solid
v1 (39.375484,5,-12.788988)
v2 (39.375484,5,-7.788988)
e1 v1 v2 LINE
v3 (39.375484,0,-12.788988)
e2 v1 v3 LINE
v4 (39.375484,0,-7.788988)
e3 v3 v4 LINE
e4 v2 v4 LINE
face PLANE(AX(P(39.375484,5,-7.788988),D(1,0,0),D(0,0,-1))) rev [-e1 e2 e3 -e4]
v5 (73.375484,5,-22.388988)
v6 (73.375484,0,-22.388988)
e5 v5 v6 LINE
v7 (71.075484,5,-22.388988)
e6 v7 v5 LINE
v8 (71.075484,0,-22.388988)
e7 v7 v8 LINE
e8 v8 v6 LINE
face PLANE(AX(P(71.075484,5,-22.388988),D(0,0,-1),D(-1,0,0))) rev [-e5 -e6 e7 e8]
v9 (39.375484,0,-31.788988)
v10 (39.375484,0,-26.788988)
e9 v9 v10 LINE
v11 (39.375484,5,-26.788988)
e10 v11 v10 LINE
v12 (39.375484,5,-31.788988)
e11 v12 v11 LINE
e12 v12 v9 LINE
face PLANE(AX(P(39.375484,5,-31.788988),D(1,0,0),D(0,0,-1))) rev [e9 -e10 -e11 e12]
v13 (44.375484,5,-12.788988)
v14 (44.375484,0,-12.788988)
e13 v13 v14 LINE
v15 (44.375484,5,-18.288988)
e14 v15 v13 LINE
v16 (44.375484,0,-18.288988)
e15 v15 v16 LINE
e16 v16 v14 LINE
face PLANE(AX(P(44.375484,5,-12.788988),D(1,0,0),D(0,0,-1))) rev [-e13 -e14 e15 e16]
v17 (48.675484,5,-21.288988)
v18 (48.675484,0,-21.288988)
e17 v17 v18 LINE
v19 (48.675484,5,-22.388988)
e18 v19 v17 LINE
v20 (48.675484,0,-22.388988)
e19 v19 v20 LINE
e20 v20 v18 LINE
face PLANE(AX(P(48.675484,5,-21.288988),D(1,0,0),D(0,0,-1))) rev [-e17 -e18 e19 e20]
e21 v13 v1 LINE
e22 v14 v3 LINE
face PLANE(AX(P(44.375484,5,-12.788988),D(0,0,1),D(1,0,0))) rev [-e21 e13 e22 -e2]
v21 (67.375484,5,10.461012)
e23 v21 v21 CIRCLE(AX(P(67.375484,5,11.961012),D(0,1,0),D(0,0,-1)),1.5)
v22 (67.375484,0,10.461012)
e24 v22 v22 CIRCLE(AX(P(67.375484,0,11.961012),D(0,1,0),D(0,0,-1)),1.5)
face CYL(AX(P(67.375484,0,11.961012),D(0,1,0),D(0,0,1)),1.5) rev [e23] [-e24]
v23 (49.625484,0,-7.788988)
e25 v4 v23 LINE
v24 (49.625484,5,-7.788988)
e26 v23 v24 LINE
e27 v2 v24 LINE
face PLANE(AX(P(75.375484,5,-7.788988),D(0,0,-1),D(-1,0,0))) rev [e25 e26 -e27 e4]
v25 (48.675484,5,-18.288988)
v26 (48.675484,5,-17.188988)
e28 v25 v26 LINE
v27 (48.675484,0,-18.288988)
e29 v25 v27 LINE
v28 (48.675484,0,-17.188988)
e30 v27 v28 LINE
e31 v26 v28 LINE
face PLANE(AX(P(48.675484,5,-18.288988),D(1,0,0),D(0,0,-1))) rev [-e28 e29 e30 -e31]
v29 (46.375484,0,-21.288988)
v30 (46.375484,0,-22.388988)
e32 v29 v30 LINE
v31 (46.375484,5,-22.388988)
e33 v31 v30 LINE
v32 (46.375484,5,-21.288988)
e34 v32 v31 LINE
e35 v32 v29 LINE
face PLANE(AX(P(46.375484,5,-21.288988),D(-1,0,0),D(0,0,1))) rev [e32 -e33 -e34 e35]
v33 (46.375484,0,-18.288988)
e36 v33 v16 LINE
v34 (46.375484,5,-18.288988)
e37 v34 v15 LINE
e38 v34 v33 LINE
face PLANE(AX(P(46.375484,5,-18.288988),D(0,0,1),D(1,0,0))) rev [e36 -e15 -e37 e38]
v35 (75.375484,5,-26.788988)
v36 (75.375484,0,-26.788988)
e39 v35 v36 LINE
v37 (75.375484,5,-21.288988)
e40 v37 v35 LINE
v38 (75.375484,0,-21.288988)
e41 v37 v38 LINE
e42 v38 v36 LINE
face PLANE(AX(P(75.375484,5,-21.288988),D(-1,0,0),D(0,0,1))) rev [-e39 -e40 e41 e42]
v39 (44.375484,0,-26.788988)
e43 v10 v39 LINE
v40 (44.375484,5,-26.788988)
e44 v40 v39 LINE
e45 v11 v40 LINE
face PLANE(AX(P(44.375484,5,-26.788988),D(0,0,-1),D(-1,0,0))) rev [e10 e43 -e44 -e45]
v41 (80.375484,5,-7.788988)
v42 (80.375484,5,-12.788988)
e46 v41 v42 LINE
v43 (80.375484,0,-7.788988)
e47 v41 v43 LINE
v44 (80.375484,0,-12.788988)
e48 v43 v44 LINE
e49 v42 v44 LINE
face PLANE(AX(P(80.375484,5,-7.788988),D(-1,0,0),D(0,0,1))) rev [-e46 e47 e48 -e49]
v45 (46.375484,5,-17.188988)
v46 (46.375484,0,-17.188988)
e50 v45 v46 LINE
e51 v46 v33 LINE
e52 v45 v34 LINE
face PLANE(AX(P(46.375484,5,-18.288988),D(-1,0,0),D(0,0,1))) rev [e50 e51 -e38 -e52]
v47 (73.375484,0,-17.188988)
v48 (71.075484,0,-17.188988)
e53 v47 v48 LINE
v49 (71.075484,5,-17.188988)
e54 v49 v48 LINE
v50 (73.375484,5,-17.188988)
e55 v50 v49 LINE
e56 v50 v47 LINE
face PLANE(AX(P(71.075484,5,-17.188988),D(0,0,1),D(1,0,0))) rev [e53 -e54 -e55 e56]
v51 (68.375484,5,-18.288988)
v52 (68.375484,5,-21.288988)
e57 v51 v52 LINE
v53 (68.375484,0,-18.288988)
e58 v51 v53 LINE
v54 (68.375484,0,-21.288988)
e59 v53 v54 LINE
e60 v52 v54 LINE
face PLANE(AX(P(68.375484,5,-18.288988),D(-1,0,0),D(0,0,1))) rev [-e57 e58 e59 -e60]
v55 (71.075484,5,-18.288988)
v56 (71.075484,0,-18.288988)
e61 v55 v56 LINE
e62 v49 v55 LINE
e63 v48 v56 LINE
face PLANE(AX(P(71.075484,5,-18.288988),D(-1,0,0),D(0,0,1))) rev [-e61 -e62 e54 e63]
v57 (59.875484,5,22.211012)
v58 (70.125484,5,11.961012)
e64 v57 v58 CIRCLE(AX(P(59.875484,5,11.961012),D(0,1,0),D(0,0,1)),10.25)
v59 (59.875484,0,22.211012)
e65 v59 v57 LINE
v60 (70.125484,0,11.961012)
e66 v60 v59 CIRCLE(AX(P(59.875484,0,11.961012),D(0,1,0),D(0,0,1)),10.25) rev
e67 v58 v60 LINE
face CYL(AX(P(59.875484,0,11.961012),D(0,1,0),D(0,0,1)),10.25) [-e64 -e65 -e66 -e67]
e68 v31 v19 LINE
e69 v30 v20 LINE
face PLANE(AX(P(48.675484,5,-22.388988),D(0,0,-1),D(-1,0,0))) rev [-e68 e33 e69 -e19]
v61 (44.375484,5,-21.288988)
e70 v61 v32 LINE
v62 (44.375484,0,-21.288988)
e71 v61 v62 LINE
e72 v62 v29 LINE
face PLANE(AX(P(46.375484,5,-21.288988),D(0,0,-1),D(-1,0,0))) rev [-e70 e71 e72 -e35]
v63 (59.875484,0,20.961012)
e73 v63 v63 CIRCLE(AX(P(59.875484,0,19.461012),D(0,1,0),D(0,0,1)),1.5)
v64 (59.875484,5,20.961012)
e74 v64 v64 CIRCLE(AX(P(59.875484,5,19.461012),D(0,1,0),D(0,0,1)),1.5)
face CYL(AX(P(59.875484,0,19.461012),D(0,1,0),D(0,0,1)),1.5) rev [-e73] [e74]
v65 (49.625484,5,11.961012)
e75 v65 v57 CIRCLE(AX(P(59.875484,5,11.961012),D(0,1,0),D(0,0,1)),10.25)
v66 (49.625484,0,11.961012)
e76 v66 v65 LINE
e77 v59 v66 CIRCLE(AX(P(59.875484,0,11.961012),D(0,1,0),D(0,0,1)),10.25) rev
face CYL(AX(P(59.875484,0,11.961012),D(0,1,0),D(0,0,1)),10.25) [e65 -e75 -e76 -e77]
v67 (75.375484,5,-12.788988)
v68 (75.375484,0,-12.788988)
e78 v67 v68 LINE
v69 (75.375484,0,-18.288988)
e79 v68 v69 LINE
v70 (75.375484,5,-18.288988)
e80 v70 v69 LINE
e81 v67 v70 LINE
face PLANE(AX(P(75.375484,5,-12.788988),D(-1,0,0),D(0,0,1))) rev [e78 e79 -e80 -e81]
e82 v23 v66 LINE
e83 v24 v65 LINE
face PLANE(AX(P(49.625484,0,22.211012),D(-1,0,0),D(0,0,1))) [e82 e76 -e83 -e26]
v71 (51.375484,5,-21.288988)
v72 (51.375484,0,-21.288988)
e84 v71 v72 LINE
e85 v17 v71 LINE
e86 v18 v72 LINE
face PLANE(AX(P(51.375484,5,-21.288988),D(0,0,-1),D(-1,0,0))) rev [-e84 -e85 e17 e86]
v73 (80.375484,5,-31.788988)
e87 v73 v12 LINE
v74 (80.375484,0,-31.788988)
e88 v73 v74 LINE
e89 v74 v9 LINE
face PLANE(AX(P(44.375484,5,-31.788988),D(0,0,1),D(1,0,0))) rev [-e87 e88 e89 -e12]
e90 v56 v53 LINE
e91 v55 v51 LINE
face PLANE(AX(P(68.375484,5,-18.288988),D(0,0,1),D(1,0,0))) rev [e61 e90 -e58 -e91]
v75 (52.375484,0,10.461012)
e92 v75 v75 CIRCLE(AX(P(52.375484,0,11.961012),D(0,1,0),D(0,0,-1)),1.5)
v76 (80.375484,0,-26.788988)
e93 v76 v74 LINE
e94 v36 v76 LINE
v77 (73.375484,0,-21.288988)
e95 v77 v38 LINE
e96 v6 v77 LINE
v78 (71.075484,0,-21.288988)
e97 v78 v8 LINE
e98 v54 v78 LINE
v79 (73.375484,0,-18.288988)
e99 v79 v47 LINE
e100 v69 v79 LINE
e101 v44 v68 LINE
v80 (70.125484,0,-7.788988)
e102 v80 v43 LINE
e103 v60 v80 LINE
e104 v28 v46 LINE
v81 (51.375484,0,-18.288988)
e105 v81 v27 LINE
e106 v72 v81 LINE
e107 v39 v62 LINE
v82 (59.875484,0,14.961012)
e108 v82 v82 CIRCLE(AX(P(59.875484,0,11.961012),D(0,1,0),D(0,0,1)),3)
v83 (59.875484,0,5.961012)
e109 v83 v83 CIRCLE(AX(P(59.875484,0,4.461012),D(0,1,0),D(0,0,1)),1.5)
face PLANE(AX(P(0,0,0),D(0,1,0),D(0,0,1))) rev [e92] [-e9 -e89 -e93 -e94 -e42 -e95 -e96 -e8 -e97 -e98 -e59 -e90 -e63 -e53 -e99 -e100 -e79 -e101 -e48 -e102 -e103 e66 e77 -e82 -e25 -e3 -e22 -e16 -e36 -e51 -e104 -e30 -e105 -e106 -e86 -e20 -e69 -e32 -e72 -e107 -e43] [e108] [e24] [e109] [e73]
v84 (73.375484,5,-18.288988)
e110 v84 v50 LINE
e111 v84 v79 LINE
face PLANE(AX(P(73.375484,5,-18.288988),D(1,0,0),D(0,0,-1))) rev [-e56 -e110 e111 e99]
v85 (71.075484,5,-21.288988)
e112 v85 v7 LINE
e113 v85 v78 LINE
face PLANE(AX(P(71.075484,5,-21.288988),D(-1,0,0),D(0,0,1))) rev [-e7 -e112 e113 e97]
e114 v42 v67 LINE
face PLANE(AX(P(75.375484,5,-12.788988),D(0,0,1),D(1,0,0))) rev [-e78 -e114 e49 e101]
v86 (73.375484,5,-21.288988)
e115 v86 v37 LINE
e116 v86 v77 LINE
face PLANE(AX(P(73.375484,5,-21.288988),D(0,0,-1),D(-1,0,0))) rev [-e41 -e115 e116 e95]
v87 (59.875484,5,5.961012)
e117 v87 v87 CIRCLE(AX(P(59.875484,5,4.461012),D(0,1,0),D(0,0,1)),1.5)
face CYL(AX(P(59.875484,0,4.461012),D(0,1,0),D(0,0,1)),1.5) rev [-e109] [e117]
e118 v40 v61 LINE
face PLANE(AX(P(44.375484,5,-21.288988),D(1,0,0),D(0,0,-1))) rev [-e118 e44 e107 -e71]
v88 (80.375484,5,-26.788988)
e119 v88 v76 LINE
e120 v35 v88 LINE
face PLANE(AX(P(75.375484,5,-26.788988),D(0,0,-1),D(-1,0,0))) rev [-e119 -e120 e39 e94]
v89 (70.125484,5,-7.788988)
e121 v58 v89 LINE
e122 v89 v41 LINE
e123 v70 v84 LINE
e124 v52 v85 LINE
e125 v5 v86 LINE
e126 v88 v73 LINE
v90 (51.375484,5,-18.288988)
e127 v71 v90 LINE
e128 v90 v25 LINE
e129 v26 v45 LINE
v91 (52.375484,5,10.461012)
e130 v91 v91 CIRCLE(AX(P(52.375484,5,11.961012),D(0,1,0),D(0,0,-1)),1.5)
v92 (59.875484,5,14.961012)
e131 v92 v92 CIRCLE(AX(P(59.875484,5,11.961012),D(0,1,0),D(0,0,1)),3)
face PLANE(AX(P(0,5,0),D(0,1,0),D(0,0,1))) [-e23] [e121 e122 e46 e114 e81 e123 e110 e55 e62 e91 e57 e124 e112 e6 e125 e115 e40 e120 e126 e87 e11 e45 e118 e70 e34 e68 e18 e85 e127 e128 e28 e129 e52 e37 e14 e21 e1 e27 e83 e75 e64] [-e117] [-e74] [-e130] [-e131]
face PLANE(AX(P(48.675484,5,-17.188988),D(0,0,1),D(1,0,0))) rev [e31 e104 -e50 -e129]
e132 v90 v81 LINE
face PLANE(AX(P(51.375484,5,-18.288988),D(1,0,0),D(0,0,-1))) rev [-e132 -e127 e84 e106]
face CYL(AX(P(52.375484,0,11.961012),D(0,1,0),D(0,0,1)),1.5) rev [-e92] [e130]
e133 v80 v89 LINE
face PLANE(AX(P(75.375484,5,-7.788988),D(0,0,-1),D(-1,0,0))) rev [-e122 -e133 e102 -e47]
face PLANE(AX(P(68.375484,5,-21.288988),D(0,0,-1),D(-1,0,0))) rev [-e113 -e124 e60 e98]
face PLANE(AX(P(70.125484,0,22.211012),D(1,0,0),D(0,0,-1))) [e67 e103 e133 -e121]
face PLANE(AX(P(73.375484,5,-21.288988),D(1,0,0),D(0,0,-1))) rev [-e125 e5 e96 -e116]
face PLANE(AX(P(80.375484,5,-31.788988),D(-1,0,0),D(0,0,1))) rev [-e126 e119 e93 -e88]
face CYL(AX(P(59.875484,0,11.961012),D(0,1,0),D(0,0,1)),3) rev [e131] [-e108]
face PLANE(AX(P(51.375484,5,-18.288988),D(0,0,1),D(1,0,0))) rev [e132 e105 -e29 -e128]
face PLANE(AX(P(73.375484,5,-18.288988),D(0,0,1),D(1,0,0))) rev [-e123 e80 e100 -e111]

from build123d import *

# Parameters (mm, degrees)
BOSS_EXTRUDE1_DEPTH = 5
SKETCH2_W           = 20.5
SKETCH2_H           = 30
SKETCH2_R           = 3
SKETCH2_R_2         = 1.5
BOSS_EXTRUDE2_DEPTH = 5
FILLET1_R           = 10.25


with BuildPart() as part:
    # Sketch1 → Boss-Extrude1 (new body)
    with BuildSketch(Plane(origin=(0, 0, 0), x_dir=(1, 0, 0), z_dir=(0, 1, 0))):
        Polygon((44.375484097, 7.788988346), (75.375484097, 7.788988346), (80.375484097, 7.788988346), (80.375484097, 12.788988346), (75.375484097, 12.788988346), (75.375484097, 18.288988346), (73.375484097, 18.288988346), (73.375484097, 17.188988346), (71.075484097, 17.188988346), (71.075484097, 18.288988346), (68.375484097, 18.288988346), (68.375484097, 21.288988346), (71.075484097, 21.288988346), (71.075484097, 22.388988346), (73.375484097, 22.388988346), (73.375484097, 21.288988346), (75.375484097, 21.288988346), (75.375484097, 26.788988346), (80.375484097, 26.788988346), (80.375484097, 31.788988346), (75.375484097, 31.788988346), (44.375484097, 31.788988346), (39.375484097, 31.788988346), (39.375484097, 26.788988346), (44.375484097, 26.788988346), (44.375484097, 21.288988346), (46.375484097, 21.288988346), (46.375484097, 22.388988346), (48.675484097, 22.388988346), (48.675484097, 21.288988346), (51.375484097, 21.288988346), (51.375484097, 18.288988346), (48.675484097, 18.288988346), (48.675484097, 17.188988346), (46.375484097, 17.188988346), (46.375484097, 18.288988346), (44.375484097, 18.288988346), (44.375484097, 12.788988346), (39.375484097, 12.788988346), (39.375484097, 7.788988346), align=None)
    extrude(amount=BOSS_EXTRUDE1_DEPTH)

    # Sketch2 → Boss-Extrude2 (add)
    with BuildSketch(Plane(origin=(0, 5, 0), x_dir=(1, 0, 0), z_dir=(0, 1, 0))):
        with Locations((59.875484097, -7.211011654)):
            Rectangle(SKETCH2_W, SKETCH2_H)
        with Locations(Location((59.875484097, -11.961011654, 0), (0, 0, 270))):
            Circle(SKETCH2_R, mode=Mode.SUBTRACT)
        with Locations(Location((59.875484097, -19.461011654, 0), (0, 0, 270))):
            Circle(SKETCH2_R_2, mode=Mode.SUBTRACT)
        with Locations(Location((52.375484097, -11.961011654, 0), (0, 0, 90))):
            Circle(SKETCH2_R_2, mode=Mode.SUBTRACT)
        with Locations(Location((67.375484097, -11.961011654, 0), (0, 0, 90))):
            Circle(SKETCH2_R_2, mode=Mode.SUBTRACT)
        with Locations(Location((59.875484097, -4.461011654, 0), (0, 0, 270))):
            Circle(SKETCH2_R_2, mode=Mode.SUBTRACT)
    extrude(amount=-BOSS_EXTRUDE2_DEPTH)

    # Fillet1
    fillet1_edges = [part.edges().sort_by_distance(p)[0] for p in [
        (49.625484097, 2.5, 22.211011654),
        (70.125484097, 2.5, 22.211011654),
    ]]
    fillet(fillet1_edges, radius=FILLET1_R - 0.0001)  # a hair under: the kernel refuses the full size


solid = part.part
